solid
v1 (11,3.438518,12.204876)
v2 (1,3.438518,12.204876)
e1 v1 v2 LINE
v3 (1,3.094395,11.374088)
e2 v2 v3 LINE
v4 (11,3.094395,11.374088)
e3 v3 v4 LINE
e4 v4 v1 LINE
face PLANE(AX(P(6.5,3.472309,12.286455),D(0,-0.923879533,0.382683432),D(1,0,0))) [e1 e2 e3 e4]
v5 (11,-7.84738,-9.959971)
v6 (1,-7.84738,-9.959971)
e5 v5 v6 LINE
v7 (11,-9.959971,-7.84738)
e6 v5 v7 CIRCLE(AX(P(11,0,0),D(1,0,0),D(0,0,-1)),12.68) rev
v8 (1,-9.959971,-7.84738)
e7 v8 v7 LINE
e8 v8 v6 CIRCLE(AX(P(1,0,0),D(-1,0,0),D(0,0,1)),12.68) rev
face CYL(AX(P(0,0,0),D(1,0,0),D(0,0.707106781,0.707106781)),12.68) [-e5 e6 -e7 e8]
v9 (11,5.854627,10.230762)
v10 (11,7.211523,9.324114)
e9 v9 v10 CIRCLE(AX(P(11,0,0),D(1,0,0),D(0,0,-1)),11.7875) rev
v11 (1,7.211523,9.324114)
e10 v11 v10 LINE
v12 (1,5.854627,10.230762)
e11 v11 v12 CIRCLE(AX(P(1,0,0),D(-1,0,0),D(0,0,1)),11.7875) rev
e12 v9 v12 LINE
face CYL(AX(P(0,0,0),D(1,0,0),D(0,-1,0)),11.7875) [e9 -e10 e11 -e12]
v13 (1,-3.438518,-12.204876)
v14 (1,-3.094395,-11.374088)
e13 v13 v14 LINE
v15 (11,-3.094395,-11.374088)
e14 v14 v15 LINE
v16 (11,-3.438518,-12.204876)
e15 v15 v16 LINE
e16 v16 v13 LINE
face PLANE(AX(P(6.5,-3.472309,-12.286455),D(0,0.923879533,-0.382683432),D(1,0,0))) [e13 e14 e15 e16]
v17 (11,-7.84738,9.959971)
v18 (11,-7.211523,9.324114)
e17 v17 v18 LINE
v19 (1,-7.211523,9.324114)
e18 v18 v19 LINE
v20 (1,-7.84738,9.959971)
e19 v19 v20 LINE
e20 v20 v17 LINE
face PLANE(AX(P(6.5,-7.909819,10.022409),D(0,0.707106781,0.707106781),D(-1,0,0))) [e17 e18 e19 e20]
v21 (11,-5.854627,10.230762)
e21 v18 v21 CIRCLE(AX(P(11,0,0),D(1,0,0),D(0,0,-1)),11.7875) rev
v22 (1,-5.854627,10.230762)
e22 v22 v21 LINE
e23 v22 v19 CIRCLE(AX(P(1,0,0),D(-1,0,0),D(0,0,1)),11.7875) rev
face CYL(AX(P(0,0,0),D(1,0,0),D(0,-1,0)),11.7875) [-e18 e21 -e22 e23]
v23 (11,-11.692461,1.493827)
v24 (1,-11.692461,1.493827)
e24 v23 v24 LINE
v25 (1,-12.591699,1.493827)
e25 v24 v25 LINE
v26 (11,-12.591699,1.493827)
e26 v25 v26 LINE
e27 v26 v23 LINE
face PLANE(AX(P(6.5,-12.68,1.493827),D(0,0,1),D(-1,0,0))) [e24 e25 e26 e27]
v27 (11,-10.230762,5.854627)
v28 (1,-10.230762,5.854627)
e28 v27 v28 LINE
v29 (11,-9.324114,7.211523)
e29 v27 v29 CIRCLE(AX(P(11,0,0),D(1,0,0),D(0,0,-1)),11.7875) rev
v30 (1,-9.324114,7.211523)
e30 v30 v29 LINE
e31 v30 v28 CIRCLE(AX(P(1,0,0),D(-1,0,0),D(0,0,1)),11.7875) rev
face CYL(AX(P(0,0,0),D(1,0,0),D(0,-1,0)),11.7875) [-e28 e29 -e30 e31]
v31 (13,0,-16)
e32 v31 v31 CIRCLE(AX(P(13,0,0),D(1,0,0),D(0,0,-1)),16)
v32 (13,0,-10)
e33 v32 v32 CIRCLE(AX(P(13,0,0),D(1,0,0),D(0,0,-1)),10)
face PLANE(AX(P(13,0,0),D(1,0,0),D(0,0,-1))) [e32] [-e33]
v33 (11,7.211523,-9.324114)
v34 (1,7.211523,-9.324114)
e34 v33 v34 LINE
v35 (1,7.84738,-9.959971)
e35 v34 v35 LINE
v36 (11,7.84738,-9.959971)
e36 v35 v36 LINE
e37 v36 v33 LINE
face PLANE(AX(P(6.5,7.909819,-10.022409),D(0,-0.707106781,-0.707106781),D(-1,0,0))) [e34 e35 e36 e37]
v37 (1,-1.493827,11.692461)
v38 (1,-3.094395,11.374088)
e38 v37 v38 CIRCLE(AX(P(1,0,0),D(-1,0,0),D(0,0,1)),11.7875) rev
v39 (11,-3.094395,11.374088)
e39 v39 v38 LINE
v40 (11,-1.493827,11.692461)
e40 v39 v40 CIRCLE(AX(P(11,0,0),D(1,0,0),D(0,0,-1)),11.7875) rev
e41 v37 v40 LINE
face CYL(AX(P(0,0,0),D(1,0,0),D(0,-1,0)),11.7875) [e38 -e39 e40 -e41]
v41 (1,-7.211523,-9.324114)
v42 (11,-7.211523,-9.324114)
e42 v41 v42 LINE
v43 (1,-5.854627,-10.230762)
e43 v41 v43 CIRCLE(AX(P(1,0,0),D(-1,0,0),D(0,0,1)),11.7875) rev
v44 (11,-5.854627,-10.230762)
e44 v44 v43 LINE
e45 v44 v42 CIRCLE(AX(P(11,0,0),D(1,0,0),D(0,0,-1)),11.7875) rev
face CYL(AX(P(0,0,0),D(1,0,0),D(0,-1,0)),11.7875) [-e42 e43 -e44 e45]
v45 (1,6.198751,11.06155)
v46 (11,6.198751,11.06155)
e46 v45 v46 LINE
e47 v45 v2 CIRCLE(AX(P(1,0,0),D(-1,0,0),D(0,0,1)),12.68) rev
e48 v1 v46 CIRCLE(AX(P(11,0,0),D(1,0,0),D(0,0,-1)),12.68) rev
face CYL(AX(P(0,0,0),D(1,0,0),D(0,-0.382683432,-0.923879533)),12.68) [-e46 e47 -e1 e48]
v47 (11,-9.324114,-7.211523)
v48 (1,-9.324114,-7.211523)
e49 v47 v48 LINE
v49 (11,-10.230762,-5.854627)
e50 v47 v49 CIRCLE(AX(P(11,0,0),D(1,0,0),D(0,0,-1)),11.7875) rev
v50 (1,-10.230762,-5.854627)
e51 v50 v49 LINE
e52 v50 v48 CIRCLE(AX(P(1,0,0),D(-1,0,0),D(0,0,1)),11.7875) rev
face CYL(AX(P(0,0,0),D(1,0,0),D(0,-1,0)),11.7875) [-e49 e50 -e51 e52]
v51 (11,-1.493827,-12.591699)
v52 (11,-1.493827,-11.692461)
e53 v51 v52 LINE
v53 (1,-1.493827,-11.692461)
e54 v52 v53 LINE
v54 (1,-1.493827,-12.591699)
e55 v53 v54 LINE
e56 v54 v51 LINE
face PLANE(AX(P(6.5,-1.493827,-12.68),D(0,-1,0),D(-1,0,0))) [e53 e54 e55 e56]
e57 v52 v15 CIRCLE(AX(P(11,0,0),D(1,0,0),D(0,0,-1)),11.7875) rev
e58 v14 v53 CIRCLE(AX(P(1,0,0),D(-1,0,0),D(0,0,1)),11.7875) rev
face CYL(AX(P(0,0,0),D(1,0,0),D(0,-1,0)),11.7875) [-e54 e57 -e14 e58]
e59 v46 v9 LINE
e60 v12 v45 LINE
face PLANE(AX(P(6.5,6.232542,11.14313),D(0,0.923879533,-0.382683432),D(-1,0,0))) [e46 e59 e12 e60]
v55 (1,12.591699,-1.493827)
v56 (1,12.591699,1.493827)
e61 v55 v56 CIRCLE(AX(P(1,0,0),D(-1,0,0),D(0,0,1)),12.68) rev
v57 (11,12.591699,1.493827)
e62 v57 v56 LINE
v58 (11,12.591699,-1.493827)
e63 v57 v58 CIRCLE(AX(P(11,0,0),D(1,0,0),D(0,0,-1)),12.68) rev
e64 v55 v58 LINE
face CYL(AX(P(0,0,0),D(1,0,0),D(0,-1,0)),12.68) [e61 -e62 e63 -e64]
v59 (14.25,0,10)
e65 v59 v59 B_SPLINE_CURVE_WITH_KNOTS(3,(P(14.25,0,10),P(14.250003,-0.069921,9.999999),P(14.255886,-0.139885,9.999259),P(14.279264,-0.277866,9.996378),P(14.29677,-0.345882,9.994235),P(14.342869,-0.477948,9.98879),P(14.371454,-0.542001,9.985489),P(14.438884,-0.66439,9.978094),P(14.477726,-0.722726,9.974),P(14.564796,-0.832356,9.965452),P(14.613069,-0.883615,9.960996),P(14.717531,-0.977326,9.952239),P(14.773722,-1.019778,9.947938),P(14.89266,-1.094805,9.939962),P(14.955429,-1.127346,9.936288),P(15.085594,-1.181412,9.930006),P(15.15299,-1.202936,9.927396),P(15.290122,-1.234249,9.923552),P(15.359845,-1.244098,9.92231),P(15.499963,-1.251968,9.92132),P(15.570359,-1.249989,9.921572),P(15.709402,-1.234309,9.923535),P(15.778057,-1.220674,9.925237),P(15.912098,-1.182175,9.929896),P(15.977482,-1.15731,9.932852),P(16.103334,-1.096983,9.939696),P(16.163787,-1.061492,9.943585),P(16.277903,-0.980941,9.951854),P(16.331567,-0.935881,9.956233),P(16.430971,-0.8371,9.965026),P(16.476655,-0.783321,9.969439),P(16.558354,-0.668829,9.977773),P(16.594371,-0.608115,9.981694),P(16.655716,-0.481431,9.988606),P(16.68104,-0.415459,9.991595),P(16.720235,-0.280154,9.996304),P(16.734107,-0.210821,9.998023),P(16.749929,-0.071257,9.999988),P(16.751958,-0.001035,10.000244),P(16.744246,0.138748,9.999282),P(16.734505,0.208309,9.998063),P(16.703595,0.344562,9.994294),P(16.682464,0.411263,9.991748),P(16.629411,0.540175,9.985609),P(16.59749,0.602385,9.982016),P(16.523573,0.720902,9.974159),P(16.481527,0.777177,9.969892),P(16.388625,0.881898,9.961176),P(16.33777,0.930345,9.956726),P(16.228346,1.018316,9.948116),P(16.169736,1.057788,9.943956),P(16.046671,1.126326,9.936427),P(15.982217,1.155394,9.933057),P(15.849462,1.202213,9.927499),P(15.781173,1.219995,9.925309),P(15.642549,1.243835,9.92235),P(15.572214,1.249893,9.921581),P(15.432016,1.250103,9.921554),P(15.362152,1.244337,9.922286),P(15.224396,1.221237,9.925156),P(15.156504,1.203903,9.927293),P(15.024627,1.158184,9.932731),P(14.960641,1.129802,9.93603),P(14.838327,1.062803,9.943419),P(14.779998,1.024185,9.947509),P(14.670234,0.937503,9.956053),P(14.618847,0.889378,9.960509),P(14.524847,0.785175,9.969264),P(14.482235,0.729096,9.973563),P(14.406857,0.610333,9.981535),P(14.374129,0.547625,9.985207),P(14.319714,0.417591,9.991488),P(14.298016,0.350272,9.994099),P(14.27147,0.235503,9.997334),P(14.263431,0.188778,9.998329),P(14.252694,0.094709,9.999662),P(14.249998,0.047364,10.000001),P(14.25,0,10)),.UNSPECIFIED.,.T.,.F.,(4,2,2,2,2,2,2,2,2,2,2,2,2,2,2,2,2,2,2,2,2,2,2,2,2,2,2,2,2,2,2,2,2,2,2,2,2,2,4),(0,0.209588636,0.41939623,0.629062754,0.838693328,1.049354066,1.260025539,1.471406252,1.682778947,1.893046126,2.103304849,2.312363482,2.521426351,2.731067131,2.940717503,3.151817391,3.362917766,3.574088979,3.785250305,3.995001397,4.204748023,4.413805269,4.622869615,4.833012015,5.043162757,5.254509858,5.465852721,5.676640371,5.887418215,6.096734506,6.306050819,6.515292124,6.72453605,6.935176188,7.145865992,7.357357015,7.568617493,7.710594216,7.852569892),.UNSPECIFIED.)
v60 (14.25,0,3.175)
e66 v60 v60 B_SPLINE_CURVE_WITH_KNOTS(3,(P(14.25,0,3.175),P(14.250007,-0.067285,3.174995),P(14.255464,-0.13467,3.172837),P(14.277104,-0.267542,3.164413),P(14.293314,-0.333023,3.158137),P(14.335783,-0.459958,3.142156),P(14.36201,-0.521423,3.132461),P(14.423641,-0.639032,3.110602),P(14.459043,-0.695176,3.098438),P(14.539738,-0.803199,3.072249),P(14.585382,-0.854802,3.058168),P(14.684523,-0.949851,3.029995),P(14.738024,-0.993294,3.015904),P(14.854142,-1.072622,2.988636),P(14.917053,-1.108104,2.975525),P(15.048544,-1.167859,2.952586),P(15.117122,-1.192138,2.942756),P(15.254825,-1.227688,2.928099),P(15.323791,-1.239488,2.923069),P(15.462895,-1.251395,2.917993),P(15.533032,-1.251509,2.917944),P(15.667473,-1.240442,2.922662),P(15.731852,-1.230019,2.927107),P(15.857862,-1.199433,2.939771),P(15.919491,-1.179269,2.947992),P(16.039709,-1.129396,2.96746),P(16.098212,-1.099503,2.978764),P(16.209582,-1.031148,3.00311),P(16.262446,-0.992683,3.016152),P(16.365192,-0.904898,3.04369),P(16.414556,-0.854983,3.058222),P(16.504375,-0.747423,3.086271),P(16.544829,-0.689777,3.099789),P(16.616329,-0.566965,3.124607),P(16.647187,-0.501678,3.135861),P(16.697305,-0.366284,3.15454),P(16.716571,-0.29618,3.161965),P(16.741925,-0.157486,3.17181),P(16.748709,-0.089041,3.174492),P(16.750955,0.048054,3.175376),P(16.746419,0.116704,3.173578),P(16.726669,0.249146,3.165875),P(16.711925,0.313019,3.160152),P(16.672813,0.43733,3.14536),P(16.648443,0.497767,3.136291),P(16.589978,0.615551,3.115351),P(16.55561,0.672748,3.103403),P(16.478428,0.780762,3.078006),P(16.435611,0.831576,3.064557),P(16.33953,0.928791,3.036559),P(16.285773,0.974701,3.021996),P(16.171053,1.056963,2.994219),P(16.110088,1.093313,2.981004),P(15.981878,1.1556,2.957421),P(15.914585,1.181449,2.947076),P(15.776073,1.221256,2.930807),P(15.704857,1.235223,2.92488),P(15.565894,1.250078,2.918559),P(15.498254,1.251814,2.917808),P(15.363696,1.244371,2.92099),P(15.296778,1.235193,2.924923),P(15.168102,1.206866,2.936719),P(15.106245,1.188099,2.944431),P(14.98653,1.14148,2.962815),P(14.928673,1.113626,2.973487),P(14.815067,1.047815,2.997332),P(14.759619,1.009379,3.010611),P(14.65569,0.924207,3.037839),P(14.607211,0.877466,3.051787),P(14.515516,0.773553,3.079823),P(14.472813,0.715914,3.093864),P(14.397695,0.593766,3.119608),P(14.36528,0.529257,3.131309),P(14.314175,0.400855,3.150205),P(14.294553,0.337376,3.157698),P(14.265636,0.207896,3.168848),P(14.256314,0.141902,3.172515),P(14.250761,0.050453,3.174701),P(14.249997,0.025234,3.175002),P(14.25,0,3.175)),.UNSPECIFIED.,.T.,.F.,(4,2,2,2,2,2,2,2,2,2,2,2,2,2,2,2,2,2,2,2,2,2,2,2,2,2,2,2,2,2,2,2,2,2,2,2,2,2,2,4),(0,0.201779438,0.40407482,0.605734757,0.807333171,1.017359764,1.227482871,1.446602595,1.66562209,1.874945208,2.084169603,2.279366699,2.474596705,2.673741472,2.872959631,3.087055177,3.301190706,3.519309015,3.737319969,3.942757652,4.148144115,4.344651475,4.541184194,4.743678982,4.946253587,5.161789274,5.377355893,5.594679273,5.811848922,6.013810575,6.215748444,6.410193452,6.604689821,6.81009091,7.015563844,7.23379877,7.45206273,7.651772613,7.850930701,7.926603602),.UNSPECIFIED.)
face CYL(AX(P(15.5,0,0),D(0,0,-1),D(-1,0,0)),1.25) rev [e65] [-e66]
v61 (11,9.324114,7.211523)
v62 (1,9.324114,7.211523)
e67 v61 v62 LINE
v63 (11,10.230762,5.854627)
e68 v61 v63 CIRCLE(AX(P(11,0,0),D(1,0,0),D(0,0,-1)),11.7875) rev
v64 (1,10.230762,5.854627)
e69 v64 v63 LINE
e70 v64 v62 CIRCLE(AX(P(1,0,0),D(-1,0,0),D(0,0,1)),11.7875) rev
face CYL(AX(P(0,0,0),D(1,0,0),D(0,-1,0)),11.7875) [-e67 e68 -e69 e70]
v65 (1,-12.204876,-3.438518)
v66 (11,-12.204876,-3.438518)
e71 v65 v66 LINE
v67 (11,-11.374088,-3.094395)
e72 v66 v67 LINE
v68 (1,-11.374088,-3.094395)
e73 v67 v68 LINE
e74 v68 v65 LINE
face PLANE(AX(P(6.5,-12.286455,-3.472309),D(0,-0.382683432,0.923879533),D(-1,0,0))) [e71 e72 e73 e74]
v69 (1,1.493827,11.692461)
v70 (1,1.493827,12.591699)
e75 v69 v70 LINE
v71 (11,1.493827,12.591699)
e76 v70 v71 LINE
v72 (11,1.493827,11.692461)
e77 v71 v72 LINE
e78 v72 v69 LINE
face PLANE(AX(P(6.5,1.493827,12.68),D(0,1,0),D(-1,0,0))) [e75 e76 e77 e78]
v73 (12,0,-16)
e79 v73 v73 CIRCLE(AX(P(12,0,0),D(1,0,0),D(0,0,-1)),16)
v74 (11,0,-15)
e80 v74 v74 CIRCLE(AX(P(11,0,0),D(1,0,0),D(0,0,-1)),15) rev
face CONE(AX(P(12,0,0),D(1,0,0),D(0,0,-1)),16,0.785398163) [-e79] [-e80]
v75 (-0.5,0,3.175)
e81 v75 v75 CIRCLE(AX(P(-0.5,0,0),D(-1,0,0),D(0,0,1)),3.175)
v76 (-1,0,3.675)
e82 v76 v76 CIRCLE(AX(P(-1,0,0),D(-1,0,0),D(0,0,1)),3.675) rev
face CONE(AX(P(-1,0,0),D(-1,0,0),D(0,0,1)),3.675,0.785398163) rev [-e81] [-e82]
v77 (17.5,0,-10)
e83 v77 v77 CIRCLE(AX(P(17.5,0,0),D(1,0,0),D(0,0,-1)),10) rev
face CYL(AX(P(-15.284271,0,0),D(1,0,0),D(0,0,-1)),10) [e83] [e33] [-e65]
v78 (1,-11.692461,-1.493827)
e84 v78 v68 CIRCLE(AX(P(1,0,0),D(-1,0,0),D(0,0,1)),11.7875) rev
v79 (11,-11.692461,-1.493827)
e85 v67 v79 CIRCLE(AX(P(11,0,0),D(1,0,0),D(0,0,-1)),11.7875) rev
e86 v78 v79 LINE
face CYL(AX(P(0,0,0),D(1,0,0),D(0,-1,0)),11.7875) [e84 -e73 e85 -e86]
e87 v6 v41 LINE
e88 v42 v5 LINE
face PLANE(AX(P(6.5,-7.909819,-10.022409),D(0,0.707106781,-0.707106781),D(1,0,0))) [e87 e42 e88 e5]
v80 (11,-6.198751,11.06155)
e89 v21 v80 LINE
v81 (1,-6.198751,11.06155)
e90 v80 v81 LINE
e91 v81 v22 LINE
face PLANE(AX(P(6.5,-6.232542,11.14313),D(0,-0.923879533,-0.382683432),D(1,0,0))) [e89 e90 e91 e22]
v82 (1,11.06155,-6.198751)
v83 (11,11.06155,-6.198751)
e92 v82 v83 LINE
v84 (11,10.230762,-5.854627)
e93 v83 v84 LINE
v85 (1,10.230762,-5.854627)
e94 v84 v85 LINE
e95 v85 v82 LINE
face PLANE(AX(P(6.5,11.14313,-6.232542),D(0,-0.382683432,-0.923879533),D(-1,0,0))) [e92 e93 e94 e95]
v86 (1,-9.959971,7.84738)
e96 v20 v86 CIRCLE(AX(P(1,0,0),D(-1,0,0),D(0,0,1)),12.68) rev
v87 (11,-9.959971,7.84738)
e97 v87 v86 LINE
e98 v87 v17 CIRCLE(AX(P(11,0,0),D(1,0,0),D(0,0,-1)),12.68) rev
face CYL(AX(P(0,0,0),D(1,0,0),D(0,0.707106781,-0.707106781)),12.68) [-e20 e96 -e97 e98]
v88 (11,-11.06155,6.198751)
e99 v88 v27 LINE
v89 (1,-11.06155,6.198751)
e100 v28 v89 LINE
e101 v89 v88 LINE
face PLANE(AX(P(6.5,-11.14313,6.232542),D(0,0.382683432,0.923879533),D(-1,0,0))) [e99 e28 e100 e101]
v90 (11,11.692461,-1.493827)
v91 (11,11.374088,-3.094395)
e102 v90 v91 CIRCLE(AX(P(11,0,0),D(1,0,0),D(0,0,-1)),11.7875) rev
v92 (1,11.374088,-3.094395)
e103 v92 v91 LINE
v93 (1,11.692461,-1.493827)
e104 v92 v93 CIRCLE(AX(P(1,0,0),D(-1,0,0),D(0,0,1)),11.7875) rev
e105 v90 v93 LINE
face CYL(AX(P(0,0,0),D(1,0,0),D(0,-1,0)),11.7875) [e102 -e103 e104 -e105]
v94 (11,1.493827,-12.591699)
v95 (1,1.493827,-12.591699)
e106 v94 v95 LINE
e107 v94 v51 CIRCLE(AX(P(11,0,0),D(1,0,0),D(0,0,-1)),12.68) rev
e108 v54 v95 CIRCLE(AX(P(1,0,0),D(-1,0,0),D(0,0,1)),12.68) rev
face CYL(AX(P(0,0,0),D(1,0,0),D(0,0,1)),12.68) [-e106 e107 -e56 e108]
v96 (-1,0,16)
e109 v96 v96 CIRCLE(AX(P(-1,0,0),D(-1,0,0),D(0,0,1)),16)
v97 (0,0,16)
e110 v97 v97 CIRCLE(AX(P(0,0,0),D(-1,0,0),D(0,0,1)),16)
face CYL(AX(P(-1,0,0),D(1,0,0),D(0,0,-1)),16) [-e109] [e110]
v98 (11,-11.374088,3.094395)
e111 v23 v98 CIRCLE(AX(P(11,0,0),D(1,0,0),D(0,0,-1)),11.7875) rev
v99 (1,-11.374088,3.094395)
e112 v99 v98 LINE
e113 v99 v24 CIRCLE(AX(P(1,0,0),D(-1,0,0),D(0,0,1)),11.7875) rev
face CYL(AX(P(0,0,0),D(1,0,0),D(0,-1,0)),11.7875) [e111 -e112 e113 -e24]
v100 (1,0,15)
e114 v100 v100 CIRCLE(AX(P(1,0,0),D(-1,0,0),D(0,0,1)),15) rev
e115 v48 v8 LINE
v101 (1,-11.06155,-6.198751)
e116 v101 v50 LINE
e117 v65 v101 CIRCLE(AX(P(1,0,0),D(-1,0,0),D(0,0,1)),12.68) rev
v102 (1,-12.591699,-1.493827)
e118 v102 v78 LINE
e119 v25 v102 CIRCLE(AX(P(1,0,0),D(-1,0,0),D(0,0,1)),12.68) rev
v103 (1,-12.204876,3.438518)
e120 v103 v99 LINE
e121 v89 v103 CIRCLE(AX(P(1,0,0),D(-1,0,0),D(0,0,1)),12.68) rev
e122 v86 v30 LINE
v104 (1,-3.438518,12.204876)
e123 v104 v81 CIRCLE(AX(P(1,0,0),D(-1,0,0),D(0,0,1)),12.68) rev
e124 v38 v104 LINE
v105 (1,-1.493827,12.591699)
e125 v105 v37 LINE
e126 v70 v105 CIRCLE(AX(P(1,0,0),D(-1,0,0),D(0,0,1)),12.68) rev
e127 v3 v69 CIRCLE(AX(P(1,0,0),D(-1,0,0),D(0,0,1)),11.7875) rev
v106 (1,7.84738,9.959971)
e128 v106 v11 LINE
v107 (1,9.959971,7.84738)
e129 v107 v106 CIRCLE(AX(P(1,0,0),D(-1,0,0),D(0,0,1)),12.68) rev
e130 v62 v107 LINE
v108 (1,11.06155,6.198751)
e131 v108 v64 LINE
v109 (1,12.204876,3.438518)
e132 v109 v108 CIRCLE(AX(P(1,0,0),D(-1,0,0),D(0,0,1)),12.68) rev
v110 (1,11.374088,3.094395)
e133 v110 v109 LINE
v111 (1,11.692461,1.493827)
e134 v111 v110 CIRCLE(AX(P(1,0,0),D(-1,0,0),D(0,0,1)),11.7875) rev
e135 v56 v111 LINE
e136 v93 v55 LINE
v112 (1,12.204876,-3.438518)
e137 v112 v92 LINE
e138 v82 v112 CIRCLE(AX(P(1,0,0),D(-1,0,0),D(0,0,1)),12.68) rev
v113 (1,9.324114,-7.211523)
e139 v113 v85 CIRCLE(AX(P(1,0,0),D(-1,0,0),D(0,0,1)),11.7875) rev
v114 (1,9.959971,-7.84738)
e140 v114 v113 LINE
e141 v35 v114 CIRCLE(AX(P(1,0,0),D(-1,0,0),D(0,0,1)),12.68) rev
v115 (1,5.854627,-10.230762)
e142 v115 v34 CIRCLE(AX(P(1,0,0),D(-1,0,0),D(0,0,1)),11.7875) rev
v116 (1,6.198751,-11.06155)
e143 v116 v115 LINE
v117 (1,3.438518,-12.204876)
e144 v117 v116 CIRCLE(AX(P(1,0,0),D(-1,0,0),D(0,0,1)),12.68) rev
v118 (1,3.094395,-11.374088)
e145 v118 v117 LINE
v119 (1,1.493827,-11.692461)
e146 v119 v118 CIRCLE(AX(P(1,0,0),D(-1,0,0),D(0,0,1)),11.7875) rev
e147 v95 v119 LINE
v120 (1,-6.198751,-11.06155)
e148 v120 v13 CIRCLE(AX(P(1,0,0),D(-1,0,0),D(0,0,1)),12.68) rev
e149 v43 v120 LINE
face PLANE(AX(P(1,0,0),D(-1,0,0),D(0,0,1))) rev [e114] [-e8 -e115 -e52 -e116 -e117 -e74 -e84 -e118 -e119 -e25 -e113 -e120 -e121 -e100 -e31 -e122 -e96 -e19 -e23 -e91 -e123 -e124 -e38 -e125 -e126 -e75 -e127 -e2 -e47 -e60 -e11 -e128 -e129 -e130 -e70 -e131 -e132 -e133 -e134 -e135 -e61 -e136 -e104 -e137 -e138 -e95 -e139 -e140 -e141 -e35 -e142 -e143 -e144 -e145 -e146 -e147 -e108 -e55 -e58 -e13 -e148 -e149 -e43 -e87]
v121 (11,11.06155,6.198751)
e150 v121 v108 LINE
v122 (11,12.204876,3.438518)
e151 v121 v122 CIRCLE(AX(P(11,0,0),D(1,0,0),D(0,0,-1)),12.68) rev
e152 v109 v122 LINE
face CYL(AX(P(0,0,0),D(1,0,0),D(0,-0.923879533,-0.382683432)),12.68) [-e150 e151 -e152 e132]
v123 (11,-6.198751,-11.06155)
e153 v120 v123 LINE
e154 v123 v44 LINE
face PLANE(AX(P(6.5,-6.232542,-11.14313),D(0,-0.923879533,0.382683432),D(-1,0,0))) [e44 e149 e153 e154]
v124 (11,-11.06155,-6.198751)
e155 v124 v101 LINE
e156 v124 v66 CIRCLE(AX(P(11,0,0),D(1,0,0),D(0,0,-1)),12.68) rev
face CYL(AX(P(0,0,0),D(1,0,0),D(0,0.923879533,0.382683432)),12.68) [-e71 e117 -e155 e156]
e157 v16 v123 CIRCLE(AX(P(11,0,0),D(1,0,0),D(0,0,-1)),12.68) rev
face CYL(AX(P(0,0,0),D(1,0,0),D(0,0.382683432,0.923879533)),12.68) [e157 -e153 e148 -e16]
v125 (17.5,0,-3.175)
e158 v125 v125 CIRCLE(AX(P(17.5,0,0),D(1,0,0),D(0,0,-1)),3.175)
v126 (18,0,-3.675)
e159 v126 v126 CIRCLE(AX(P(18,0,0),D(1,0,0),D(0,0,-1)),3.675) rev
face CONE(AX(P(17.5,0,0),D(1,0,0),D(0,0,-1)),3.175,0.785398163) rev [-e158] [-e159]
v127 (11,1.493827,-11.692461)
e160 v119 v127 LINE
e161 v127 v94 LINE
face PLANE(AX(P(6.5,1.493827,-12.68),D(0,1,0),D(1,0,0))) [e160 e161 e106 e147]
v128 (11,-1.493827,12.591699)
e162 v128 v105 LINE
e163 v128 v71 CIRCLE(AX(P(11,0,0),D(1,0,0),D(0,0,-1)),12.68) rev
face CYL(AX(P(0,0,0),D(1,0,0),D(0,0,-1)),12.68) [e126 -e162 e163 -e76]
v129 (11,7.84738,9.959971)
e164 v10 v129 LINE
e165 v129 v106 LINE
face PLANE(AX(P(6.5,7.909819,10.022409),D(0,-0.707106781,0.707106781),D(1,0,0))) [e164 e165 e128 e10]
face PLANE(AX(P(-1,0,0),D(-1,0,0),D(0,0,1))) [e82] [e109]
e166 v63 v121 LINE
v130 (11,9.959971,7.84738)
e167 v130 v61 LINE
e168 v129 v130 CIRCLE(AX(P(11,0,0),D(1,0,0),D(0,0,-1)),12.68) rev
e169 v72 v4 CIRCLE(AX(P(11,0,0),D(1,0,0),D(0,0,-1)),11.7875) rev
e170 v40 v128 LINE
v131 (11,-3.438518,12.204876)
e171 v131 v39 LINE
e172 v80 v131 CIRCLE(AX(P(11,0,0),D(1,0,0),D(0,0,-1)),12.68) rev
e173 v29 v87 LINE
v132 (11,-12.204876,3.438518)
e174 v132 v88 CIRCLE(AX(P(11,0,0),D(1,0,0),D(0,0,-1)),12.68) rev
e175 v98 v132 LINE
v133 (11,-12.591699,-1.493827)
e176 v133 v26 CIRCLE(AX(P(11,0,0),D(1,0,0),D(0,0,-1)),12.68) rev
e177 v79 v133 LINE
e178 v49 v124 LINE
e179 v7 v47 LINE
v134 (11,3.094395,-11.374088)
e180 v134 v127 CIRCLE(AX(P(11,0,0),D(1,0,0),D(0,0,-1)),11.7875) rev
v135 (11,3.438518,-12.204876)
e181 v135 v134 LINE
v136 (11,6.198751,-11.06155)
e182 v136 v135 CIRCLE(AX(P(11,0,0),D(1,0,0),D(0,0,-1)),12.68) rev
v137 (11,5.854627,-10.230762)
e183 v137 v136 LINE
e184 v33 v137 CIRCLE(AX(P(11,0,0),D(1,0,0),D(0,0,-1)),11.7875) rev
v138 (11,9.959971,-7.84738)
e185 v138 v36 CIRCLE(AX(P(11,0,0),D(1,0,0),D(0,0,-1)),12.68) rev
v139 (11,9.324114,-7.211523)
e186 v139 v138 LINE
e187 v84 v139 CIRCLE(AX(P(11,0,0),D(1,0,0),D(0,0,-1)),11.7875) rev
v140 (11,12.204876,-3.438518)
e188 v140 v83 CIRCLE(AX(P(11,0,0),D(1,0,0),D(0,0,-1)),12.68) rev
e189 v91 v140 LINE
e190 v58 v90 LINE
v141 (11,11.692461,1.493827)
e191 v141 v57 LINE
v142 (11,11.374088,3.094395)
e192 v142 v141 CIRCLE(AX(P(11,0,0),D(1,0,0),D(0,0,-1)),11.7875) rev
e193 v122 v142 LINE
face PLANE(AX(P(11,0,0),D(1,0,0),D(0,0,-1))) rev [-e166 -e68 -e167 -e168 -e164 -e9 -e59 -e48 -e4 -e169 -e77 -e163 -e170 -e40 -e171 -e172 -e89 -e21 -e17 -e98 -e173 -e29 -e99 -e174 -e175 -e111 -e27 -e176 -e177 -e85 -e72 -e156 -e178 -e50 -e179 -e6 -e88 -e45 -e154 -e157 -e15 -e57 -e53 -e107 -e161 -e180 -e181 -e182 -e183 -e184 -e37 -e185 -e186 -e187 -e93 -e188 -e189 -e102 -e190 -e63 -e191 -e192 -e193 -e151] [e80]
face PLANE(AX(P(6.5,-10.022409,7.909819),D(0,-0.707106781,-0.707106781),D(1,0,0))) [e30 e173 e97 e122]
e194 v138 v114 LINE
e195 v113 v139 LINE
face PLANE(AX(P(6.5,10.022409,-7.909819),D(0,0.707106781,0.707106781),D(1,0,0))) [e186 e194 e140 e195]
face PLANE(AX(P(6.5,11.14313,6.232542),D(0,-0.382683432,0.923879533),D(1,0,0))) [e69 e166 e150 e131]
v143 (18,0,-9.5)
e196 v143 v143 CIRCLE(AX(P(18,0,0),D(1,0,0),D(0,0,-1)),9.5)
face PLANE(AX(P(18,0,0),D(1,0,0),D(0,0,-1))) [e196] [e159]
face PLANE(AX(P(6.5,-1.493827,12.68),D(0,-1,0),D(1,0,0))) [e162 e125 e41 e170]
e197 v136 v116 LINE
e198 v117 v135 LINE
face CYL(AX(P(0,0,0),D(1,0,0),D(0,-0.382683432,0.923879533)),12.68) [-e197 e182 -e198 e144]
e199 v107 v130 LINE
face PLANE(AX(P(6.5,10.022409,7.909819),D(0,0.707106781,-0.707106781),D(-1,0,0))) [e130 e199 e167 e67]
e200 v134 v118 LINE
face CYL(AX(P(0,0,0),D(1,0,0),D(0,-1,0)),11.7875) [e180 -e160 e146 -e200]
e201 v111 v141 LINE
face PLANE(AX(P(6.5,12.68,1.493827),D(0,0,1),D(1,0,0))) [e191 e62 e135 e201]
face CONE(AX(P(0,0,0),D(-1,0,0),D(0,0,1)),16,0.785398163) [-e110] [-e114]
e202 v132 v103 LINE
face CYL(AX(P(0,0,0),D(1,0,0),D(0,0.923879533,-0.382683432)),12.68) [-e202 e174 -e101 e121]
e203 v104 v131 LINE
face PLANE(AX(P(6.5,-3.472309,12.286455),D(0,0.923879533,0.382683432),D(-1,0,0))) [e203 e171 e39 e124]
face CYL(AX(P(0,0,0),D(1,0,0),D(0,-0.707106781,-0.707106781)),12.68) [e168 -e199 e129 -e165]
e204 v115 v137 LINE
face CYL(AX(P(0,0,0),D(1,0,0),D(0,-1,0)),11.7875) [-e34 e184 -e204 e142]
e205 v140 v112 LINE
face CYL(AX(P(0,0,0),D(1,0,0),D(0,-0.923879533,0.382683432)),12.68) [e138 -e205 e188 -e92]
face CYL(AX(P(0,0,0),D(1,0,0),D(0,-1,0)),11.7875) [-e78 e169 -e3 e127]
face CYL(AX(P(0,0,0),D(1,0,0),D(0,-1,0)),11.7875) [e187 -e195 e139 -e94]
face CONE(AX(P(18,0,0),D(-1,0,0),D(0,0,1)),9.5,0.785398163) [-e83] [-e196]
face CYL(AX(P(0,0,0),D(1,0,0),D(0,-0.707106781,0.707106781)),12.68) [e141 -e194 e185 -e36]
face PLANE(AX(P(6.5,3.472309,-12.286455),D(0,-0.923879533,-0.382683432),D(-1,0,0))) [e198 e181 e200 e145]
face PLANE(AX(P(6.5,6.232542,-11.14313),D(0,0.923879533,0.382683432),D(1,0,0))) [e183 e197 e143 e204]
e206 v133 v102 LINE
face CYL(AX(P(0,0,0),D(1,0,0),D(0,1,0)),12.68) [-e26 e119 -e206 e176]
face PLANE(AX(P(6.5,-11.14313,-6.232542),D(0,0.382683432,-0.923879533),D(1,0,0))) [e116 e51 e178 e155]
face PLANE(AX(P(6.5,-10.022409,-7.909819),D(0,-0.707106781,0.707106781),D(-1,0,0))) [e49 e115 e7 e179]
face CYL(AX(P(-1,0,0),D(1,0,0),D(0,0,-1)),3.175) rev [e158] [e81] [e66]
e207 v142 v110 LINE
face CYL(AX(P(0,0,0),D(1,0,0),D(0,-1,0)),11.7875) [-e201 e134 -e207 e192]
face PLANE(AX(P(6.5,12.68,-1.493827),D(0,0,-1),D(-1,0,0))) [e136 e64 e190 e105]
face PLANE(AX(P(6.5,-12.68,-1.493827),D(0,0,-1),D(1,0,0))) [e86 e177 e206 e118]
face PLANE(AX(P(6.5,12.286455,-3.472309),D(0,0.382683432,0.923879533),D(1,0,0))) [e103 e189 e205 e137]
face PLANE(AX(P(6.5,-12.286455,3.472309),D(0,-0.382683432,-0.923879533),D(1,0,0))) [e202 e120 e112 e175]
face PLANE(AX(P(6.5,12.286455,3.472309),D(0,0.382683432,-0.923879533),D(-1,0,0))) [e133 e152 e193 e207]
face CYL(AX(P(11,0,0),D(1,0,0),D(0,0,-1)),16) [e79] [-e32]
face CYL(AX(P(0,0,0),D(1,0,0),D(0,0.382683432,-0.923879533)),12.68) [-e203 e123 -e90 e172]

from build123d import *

# Parameters (mm, degrees)
BOSS_EXTRUDE1_START       = -13
BOSS_EXTRUDE1_DEPTH       = 14
BOSS_EXTRUDE1_START_2     = -25
BOSS_EXTRUDE1_2_OUTLINE_R = 9
BOSS_EXTRUDE1_2_DEPTH     = 12
BOSS_EXTRUDE1_START_3     = -1
BOSS_EXTRUDE1_3_OUTLINE_R = 16
BOSS_EXTRUDE1_3_DEPTH     = 2
BOSS_EXTRUDE1_4_OUTLINE_R = 14.25
BOSS_EXTRUDE1_4_DEPTH     = 0.9999999
SKETCH2_R                 = 9
CUT_EXTRUDE1_DEPTH        = 7
SKETCH3_R                 = 10
BOSS_EXTRUDE2_DEPTH       = 5
SKETCH8_R                 = 16
BOSS_EXTRUDE3_DEPTH       = 2
CHAMFER1_SIZE             = 1
SKETCH4_R                 = 3.175
CUT_EXTRUDE2_DEPTH        = 30.546573405
CHAMFER2_SIZE             = 0.5
SKETCH7_W                 = 1.25
SKETCH7_H                 = 16


with BuildPart() as part:
    # Boss-Extrude1: read off the stored shape, not the designer's step
    # Boss-Extrude1 outline → Boss-Extrude1 (new body)
    with BuildSketch(Plane.ZY.offset(BOSS_EXTRUDE1_START)):
        with BuildLine():
            ThreePointArc((-1.493827307, 11.692460658), (-2.299627171, 11.561006493), (-3.094394503, 11.374088047))
            Line((-3.094394503, 11.374088047), (-3.438518062, 12.20487581))
            ThreePointArc((-3.438518062, 12.20487581), (-4.852425922, 11.714792472), (-6.19875101, 11.061549888))
            Line((-6.19875101, 11.061549888), (-5.854627451, 10.230762125))
            ThreePointArc((-5.854627451, 10.230762125), (-6.548784122, 9.800948055), (-7.211522801, 9.324113638))
            Line((-7.211522801, 9.324113638), (-7.847380226, 9.959971063))
            ThreePointArc((-7.847380226, 9.959971063), (-8.966113985, 8.966113985), (-9.959971063, 7.847380226))
            Line((-9.959971063, 7.847380226), (-9.324113638, 7.211522801))
            ThreePointArc((-9.324113638, 7.211522801), (-9.800948055, 6.548784122), (-10.230762125, 5.854627451))
            Line((-10.230762125, 5.854627451), (-11.061549888, 6.19875101))
            ThreePointArc((-11.061549888, 6.19875101), (-11.714792472, 4.852425922), (-12.20487581, 3.438518062))
            Line((-12.20487581, 3.438518062), (-11.374088047, 3.094394503))
            ThreePointArc((-11.374088047, 3.094394503), (-11.561006493, 2.299627171), (-11.692460658, 1.493827307))
            Line((-11.692460658, 1.493827307), (-12.591698852, 1.493827307))
            ThreePointArc((-12.591698852, 1.493827307), (-12.68, 0), (-12.591698852, -1.493827307))
            Line((-12.591698852, -1.493827307), (-11.692460658, -1.493827307))
            ThreePointArc((-11.692460658, -1.493827307), (-11.561006493, -2.299627171), (-11.374088047, -3.094394503))
            Line((-11.374088047, -3.094394503), (-12.20487581, -3.438518062))
            ThreePointArc((-12.20487581, -3.438518062), (-11.714792472, -4.852425922), (-11.061549888, -6.19875101))
            Line((-11.061549888, -6.19875101), (-10.230762125, -5.854627451))
            ThreePointArc((-10.230762125, -5.854627451), (-9.800948055, -6.548784122), (-9.324113638, -7.211522801))
            Line((-9.324113638, -7.211522801), (-9.959971063, -7.847380226))
            ThreePointArc((-9.959971063, -7.847380226), (-8.966113985, -8.966113985), (-7.847380226, -9.959971063))
            Line((-7.847380226, -9.959971063), (-7.211522801, -9.324113638))
            ThreePointArc((-7.211522801, -9.324113638), (-6.548784122, -9.800948055), (-5.854627451, -10.230762125))
            Line((-5.854627451, -10.230762125), (-6.19875101, -11.061549888))
            ThreePointArc((-6.19875101, -11.061549888), (-4.852425922, -11.714792472), (-3.438518062, -12.20487581))
            Line((-3.438518062, -12.20487581), (-3.094394503, -11.374088047))
            ThreePointArc((-3.094394503, -11.374088047), (-2.299627171, -11.561006493), (-1.493827307, -11.692460658))
            Line((-1.493827307, -11.692460658), (-1.493827307, -12.591698852))
            ThreePointArc((-1.493827307, -12.591698852), (0, -12.68), (1.493827307, -12.591698852))
            Line((1.493827307, -12.591698852), (1.493827307, -11.692460658))
            ThreePointArc((1.493827307, -11.692460658), (2.299627171, -11.561006493), (3.094394503, -11.374088047))
            Line((3.094394503, -11.374088047), (3.438518062, -12.20487581))
            ThreePointArc((3.438518062, -12.20487581), (4.852425922, -11.714792472), (6.19875101, -11.061549888))
            Line((6.19875101, -11.061549888), (5.854627451, -10.230762125))
            ThreePointArc((5.854627451, -10.230762125), (6.548784122, -9.800948055), (7.211522801, -9.324113638))
            Line((7.211522801, -9.324113638), (7.847380226, -9.959971063))
            ThreePointArc((7.847380226, -9.959971063), (8.966113985, -8.966113985), (9.959971063, -7.847380226))
            Line((9.959971063, -7.847380226), (9.324113638, -7.211522801))
            ThreePointArc((9.324113638, -7.211522801), (9.800948055, -6.548784122), (10.230762125, -5.854627451))
            Line((10.230762125, -5.854627451), (11.061549888, -6.19875101))
            ThreePointArc((11.061549888, -6.19875101), (11.714792472, -4.852425922), (12.20487581, -3.438518062))
            Line((12.20487581, -3.438518062), (11.374088047, -3.094394503))
            ThreePointArc((11.374088047, -3.094394503), (11.561006493, -2.299627171), (11.692460658, -1.493827307))
            Line((11.692460658, -1.493827307), (12.591698852, -1.493827307))
            ThreePointArc((12.591698852, -1.493827307), (12.68, 0), (12.591698852, 1.493827307))
            Line((12.591698852, 1.493827307), (11.692460658, 1.493827307))
            ThreePointArc((11.692460658, 1.493827307), (11.561006493, 2.299627171), (11.374088047, 3.094394503))
            Line((11.374088047, 3.094394503), (12.20487581, 3.438518062))
            ThreePointArc((12.20487581, 3.438518062), (11.714792472, 4.852425922), (11.061549888, 6.19875101))
            Line((11.061549888, 6.19875101), (10.230762125, 5.854627451))
            ThreePointArc((10.230762125, 5.854627451), (9.800948055, 6.548784122), (9.324113638, 7.211522801))
            Line((9.324113638, 7.211522801), (9.959971063, 7.847380226))
            ThreePointArc((9.959971063, 7.847380226), (8.966113985, 8.966113985), (7.847380226, 9.959971063))
            Line((7.847380226, 9.959971063), (7.211522801, 9.324113638))
            ThreePointArc((7.211522801, 9.324113638), (6.548784122, 9.800948055), (5.854627451, 10.230762125))
            Line((5.854627451, 10.230762125), (6.19875101, 11.061549888))
            ThreePointArc((6.19875101, 11.061549888), (4.852425922, 11.714792472), (3.438518062, 12.20487581))
            Line((3.438518062, 12.20487581), (3.094394503, 11.374088047))
            ThreePointArc((3.094394503, 11.374088047), (2.299627171, 11.561006493), (1.493827307, 11.692460658))
            Line((1.493827307, 11.692460658), (1.493827307, 12.591698852))
            ThreePointArc((1.493827307, 12.591698852), (0, 12.68), (-1.493827307, 12.591698852))
            Line((-1.493827307, 12.591698852), (-1.493827307, 11.692460658))
        make_face()
    extrude(amount=BOSS_EXTRUDE1_DEPTH)

    # Boss-Extrude1 2 outline → Boss-Extrude1 2 (add)
    with BuildSketch(Plane.ZY.offset(BOSS_EXTRUDE1_START_2)):
        Circle(BOSS_EXTRUDE1_2_OUTLINE_R)
    extrude(amount=BOSS_EXTRUDE1_2_DEPTH)

    # Boss-Extrude1 3 outline → Boss-Extrude1 3 (add)
    with BuildSketch(Plane.ZY.offset(BOSS_EXTRUDE1_START_3)):
        Circle(BOSS_EXTRUDE1_3_OUTLINE_R)
        with BuildLine():
            Line((-3.438518062, 12.20487581), (-3.094394503, 11.374088047))
            ThreePointArc((-3.094394503, 11.374088047), (-2.299627171, 11.561006493), (-1.493827307, 11.692460658))
            Line((-1.493827307, 11.692460658), (-1.493827307, 12.591698852))
            ThreePointArc((-1.493827307, 12.591698852), (0, 12.68), (1.493827307, 12.591698852))
            Line((1.493827307, 12.591698852), (1.493827307, 11.692460658))
            ThreePointArc((1.493827307, 11.692460658), (2.299627171, 11.561006493), (3.094394503, 11.374088047))
            Line((3.094394503, 11.374088047), (3.438518062, 12.20487581))
            ThreePointArc((3.438518062, 12.20487581), (4.852425922, 11.714792472), (6.19875101, 11.061549888))
            Line((6.19875101, 11.061549888), (5.854627451, 10.230762125))
            ThreePointArc((5.854627451, 10.230762125), (6.548784122, 9.800948055), (7.211522801, 9.324113638))
            Line((7.211522801, 9.324113638), (7.847380226, 9.959971063))
            ThreePointArc((7.847380226, 9.959971063), (8.966113985, 8.966113985), (9.959971063, 7.847380226))
            Line((9.959971063, 7.847380226), (9.324113638, 7.211522801))
            ThreePointArc((9.324113638, 7.211522801), (9.800948055, 6.548784122), (10.230762125, 5.854627451))
            Line((10.230762125, 5.854627451), (11.061549888, 6.19875101))
            ThreePointArc((11.061549888, 6.19875101), (11.714792472, 4.852425922), (12.20487581, 3.438518062))
            Line((12.20487581, 3.438518062), (11.374088047, 3.094394503))
            ThreePointArc((11.374088047, 3.094394503), (11.561006493, 2.299627171), (11.692460658, 1.493827307))
            Line((11.692460658, 1.493827307), (12.591698852, 1.493827307))
            ThreePointArc((12.591698852, 1.493827307), (12.68, 0), (12.591698852, -1.493827307))
            Line((12.591698852, -1.493827307), (11.692460658, -1.493827307))
            ThreePointArc((11.692460658, -1.493827307), (11.561006493, -2.299627171), (11.374088047, -3.094394503))
            Line((11.374088047, -3.094394503), (12.20487581, -3.438518062))
            ThreePointArc((12.20487581, -3.438518062), (11.714792472, -4.852425922), (11.061549888, -6.19875101))
            Line((11.061549888, -6.19875101), (10.230762125, -5.854627451))
            ThreePointArc((10.230762125, -5.854627451), (9.800948055, -6.548784122), (9.324113638, -7.211522801))
            Line((9.324113638, -7.211522801), (9.959971063, -7.847380226))
            ThreePointArc((9.959971063, -7.847380226), (8.966113985, -8.966113985), (7.847380226, -9.959971063))
            Line((7.847380226, -9.959971063), (7.211522801, -9.324113638))
            ThreePointArc((7.211522801, -9.324113638), (6.548784122, -9.800948055), (5.854627451, -10.230762125))
            Line((5.854627451, -10.230762125), (6.19875101, -11.061549888))
            ThreePointArc((6.19875101, -11.061549888), (4.852425922, -11.714792472), (3.438518062, -12.20487581))
            Line((3.438518062, -12.20487581), (3.094394503, -11.374088047))
            ThreePointArc((3.094394503, -11.374088047), (2.299627171, -11.561006493), (1.493827307, -11.692460658))
            Line((1.493827307, -11.692460658), (1.493827307, -12.591698852))
            ThreePointArc((1.493827307, -12.591698852), (0, -12.68), (-1.493827307, -12.591698852))
            Line((-1.493827307, -12.591698852), (-1.493827307, -11.692460658))
            ThreePointArc((-1.493827307, -11.692460658), (-2.299627171, -11.561006493), (-3.094394503, -11.374088047))
            Line((-3.094394503, -11.374088047), (-3.438518062, -12.20487581))
            ThreePointArc((-3.438518062, -12.20487581), (-4.852425922, -11.714792472), (-6.19875101, -11.061549888))
            Line((-6.19875101, -11.061549888), (-5.854627451, -10.230762125))
            ThreePointArc((-5.854627451, -10.230762125), (-6.548784122, -9.800948055), (-7.211522801, -9.324113638))
            Line((-7.211522801, -9.324113638), (-7.847380226, -9.959971063))
            ThreePointArc((-7.847380226, -9.959971063), (-8.966113985, -8.966113985), (-9.959971063, -7.847380226))
            Line((-9.959971063, -7.847380226), (-9.324113638, -7.211522801))
            ThreePointArc((-9.324113638, -7.211522801), (-9.800948055, -6.548784122), (-10.230762125, -5.854627451))
            Line((-10.230762125, -5.854627451), (-11.061549888, -6.19875101))
            ThreePointArc((-11.061549888, -6.19875101), (-11.714792472, -4.852425922), (-12.20487581, -3.438518062))
            Line((-12.20487581, -3.438518062), (-11.374088047, -3.094394503))
            ThreePointArc((-11.374088047, -3.094394503), (-11.561006493, -2.299627171), (-11.692460658, -1.493827307))
            Line((-11.692460658, -1.493827307), (-12.591698852, -1.493827307))
            ThreePointArc((-12.591698852, -1.493827307), (-12.68, 0), (-12.591698852, 1.493827307))
            Line((-12.591698852, 1.493827307), (-11.692460658, 1.493827307))
            ThreePointArc((-11.692460658, 1.493827307), (-11.561006493, 2.299627171), (-11.374088047, 3.094394503))
            Line((-11.374088047, 3.094394503), (-12.20487581, 3.438518062))
            ThreePointArc((-12.20487581, 3.438518062), (-11.714792472, 4.852425922), (-11.061549888, 6.19875101))
            Line((-11.061549888, 6.19875101), (-10.230762125, 5.854627451))
            ThreePointArc((-10.230762125, 5.854627451), (-9.800948055, 6.548784122), (-9.324113638, 7.211522801))
            Line((-9.324113638, 7.211522801), (-9.959971063, 7.847380226))
            ThreePointArc((-9.959971063, 7.847380226), (-8.966113985, 8.966113985), (-7.847380226, 9.959971063))
            Line((-7.847380226, 9.959971063), (-7.211522801, 9.324113638))
            ThreePointArc((-7.211522801, 9.324113638), (-6.548784122, 9.800948055), (-5.854627451, 10.230762125))
            Line((-5.854627451, 10.230762125), (-6.19875101, 11.061549888))
            ThreePointArc((-6.19875101, 11.061549888), (-4.852425922, 11.714792472), (-3.438518062, 12.20487581))
        make_face(mode=Mode.SUBTRACT)
    extrude(amount=BOSS_EXTRUDE1_3_DEPTH)

    # Boss-Extrude1 4 outline → Boss-Extrude1 4 (add)
    with BuildSketch(Plane.ZY.offset(BOSS_EXTRUDE1_START)):
        Circle(BOSS_EXTRUDE1_4_OUTLINE_R)
        with BuildLine():
            Line((-3.438518062, 12.20487581), (-3.094394503, 11.374088047))
            ThreePointArc((-3.094394503, 11.374088047), (-2.299627171, 11.561006493), (-1.493827307, 11.692460658))
            Line((-1.493827307, 11.692460658), (-1.493827307, 12.591698852))
            ThreePointArc((-1.493827307, 12.591698852), (0, 12.68), (1.493827307, 12.591698852))
            Line((1.493827307, 12.591698852), (1.493827307, 11.692460658))
            ThreePointArc((1.493827307, 11.692460658), (2.299627171, 11.561006493), (3.094394503, 11.374088047))
            Line((3.094394503, 11.374088047), (3.438518062, 12.20487581))
            ThreePointArc((3.438518062, 12.20487581), (4.852425922, 11.714792472), (6.19875101, 11.061549888))
            Line((6.19875101, 11.061549888), (5.854627451, 10.230762125))
            ThreePointArc((5.854627451, 10.230762125), (6.548784122, 9.800948055), (7.211522801, 9.324113638))
            Line((7.211522801, 9.324113638), (7.847380226, 9.959971063))
            ThreePointArc((7.847380226, 9.959971063), (8.966113985, 8.966113985), (9.959971063, 7.847380226))
            Line((9.959971063, 7.847380226), (9.324113638, 7.211522801))
            ThreePointArc((9.324113638, 7.211522801), (9.800948055, 6.548784122), (10.230762125, 5.854627451))
            Line((10.230762125, 5.854627451), (11.061549888, 6.19875101))
            ThreePointArc((11.061549888, 6.19875101), (11.714792472, 4.852425922), (12.20487581, 3.438518062))
            Line((12.20487581, 3.438518062), (11.374088047, 3.094394503))
            ThreePointArc((11.374088047, 3.094394503), (11.561006493, 2.299627171), (11.692460658, 1.493827307))
            Line((11.692460658, 1.493827307), (12.591698852, 1.493827307))
            ThreePointArc((12.591698852, 1.493827307), (12.68, 0), (12.591698852, -1.493827307))
            Line((12.591698852, -1.493827307), (11.692460658, -1.493827307))
            ThreePointArc((11.692460658, -1.493827307), (11.561006493, -2.299627171), (11.374088047, -3.094394503))
            Line((11.374088047, -3.094394503), (12.20487581, -3.438518062))
            ThreePointArc((12.20487581, -3.438518062), (11.714792472, -4.852425922), (11.061549888, -6.19875101))
            Line((11.061549888, -6.19875101), (10.230762125, -5.854627451))
            ThreePointArc((10.230762125, -5.854627451), (9.800948055, -6.548784122), (9.324113638, -7.211522801))
            Line((9.324113638, -7.211522801), (9.959971063, -7.847380226))
            ThreePointArc((9.959971063, -7.847380226), (8.966113985, -8.966113985), (7.847380226, -9.959971063))
            Line((7.847380226, -9.959971063), (7.211522801, -9.324113638))
            ThreePointArc((7.211522801, -9.324113638), (6.548784122, -9.800948055), (5.854627451, -10.230762125))
            Line((5.854627451, -10.230762125), (6.19875101, -11.061549888))
            ThreePointArc((6.19875101, -11.061549888), (4.852425922, -11.714792472), (3.438518062, -12.20487581))
            Line((3.438518062, -12.20487581), (3.094394503, -11.374088047))
            ThreePointArc((3.094394503, -11.374088047), (2.299627171, -11.561006493), (1.493827307, -11.692460658))
            Line((1.493827307, -11.692460658), (1.493827307, -12.591698852))
            ThreePointArc((1.493827307, -12.591698852), (0, -12.68), (-1.493827307, -12.591698852))
            Line((-1.493827307, -12.591698852), (-1.493827307, -11.692460658))
            ThreePointArc((-1.493827307, -11.692460658), (-2.299627171, -11.561006493), (-3.094394503, -11.374088047))
            Line((-3.094394503, -11.374088047), (-3.438518062, -12.20487581))
            ThreePointArc((-3.438518062, -12.20487581), (-4.852425922, -11.714792472), (-6.19875101, -11.061549888))
            Line((-6.19875101, -11.061549888), (-5.854627451, -10.230762125))
            ThreePointArc((-5.854627451, -10.230762125), (-6.548784122, -9.800948055), (-7.211522801, -9.324113638))
            Line((-7.211522801, -9.324113638), (-7.847380226, -9.959971063))
            ThreePointArc((-7.847380226, -9.959971063), (-8.966113985, -8.966113985), (-9.959971063, -7.847380226))
            Line((-9.959971063, -7.847380226), (-9.324113638, -7.211522801))
            ThreePointArc((-9.324113638, -7.211522801), (-9.800948055, -6.548784122), (-10.230762125, -5.854627451))
            Line((-10.230762125, -5.854627451), (-11.061549888, -6.19875101))
            ThreePointArc((-11.061549888, -6.19875101), (-11.714792472, -4.852425922), (-12.20487581, -3.438518062))
            Line((-12.20487581, -3.438518062), (-11.374088047, -3.094394503))
            ThreePointArc((-11.374088047, -3.094394503), (-11.561006493, -2.299627171), (-11.692460658, -1.493827307))
            Line((-11.692460658, -1.493827307), (-12.591698852, -1.493827307))
            ThreePointArc((-12.591698852, -1.493827307), (-12.68, 0), (-12.591698852, 1.493827307))
            Line((-12.591698852, 1.493827307), (-11.692460658, 1.493827307))
            ThreePointArc((-11.692460658, 1.493827307), (-11.561006493, 2.299627171), (-11.374088047, 3.094394503))
            Line((-11.374088047, 3.094394503), (-12.20487581, 3.438518062))
            ThreePointArc((-12.20487581, 3.438518062), (-11.714792472, 4.852425922), (-11.061549888, 6.19875101))
            Line((-11.061549888, 6.19875101), (-10.230762125, 5.854627451))
            ThreePointArc((-10.230762125, 5.854627451), (-9.800948055, 6.548784122), (-9.324113638, 7.211522801))
            Line((-9.324113638, 7.211522801), (-9.959971063, 7.847380226))
            ThreePointArc((-9.959971063, 7.847380226), (-8.966113985, 8.966113985), (-7.847380226, 9.959971063))
            Line((-7.847380226, 9.959971063), (-7.211522801, 9.324113638))
            ThreePointArc((-7.211522801, 9.324113638), (-6.548784122, 9.800948055), (-5.854627451, 10.230762125))
            Line((-5.854627451, 10.230762125), (-6.19875101, 11.061549888))
            ThreePointArc((-6.19875101, 11.061549888), (-4.852425922, 11.714792472), (-3.438518062, 12.20487581))
        make_face(mode=Mode.SUBTRACT)
    extrude(amount=BOSS_EXTRUDE1_4_DEPTH)

    # Boss-Extrude1 5 outline → Boss-Extrude1 5 (revolve)
    with BuildSketch(Plane.YX):
        Polygon((11.7875, 12.0000001), (11.7875, 11), (13.25, 11), (14.25, 12), align=None)
    revolve(axis=Axis((0, 0, 0), (1, 0, 0)))

    # Sketch2 → Cut-Extrude1 (cut)
    with BuildSketch(Plane(origin=(25, 0, 0), x_dir=(0, 0, -1), z_dir=(1, 0, 0))):
        Circle(SKETCH2_R)
    extrude(amount=-CUT_EXTRUDE1_DEPTH, mode=Mode.SUBTRACT)

    # Sketch3 → Boss-Extrude2 (add)
    with BuildSketch(Plane(origin=(18, 0, 0), x_dir=(0, 0, -1), z_dir=(1, 0, 0))):
        Circle(SKETCH3_R)
    extrude(amount=-BOSS_EXTRUDE2_DEPTH)

    # Sketch8 → Boss-Extrude3 (add)
    with BuildSketch(Plane(origin=(13, 0, 0), x_dir=(0, 0, -1), z_dir=(1, 0, 0))):
        with Locations(Location((0, 0, 0), (0, 0, 180))):
            Circle(SKETCH8_R)
    extrude(amount=-BOSS_EXTRUDE3_DEPTH)

    # Chamfer1
    chamfer1_edges = [part.edges().sort_by_distance(p)[0] for p in [
        (1, 0, -16),
        (11, 0, -16),
    ]]
    chamfer(chamfer1_edges, length=CHAMFER1_SIZE)

    # Sketch4 → Cut-Extrude2 (cut, through all)
    with BuildSketch(Plane(origin=(18, 0, 0), x_dir=(0, 0, -1), z_dir=(1, 0, 0))):
        Circle(SKETCH4_R)
    extrude(amount=-CUT_EXTRUDE2_DEPTH, mode=Mode.SUBTRACT)

    # Chamfer2
    chamfer2_edges = [part.edges().sort_by_distance(p)[0] for p in [
        (18, 0, 10),
        (-1, 0, 3.175),
        (18, 0, 3.175),
    ]]
    chamfer(chamfer2_edges, length=CHAMFER2_SIZE)

    # Sketch7 → Tap Drill for M3 Tap1 (revolve, cut)
    with BuildSketch(Plane.YZ.offset(15.5)):
        with Locations((0.625, 8)):
            Rectangle(SKETCH7_W, SKETCH7_H)
    revolve(axis=Axis((15.5, 0, -6.35), (0, 0, 1)), mode=Mode.SUBTRACT)


solid = part.part
